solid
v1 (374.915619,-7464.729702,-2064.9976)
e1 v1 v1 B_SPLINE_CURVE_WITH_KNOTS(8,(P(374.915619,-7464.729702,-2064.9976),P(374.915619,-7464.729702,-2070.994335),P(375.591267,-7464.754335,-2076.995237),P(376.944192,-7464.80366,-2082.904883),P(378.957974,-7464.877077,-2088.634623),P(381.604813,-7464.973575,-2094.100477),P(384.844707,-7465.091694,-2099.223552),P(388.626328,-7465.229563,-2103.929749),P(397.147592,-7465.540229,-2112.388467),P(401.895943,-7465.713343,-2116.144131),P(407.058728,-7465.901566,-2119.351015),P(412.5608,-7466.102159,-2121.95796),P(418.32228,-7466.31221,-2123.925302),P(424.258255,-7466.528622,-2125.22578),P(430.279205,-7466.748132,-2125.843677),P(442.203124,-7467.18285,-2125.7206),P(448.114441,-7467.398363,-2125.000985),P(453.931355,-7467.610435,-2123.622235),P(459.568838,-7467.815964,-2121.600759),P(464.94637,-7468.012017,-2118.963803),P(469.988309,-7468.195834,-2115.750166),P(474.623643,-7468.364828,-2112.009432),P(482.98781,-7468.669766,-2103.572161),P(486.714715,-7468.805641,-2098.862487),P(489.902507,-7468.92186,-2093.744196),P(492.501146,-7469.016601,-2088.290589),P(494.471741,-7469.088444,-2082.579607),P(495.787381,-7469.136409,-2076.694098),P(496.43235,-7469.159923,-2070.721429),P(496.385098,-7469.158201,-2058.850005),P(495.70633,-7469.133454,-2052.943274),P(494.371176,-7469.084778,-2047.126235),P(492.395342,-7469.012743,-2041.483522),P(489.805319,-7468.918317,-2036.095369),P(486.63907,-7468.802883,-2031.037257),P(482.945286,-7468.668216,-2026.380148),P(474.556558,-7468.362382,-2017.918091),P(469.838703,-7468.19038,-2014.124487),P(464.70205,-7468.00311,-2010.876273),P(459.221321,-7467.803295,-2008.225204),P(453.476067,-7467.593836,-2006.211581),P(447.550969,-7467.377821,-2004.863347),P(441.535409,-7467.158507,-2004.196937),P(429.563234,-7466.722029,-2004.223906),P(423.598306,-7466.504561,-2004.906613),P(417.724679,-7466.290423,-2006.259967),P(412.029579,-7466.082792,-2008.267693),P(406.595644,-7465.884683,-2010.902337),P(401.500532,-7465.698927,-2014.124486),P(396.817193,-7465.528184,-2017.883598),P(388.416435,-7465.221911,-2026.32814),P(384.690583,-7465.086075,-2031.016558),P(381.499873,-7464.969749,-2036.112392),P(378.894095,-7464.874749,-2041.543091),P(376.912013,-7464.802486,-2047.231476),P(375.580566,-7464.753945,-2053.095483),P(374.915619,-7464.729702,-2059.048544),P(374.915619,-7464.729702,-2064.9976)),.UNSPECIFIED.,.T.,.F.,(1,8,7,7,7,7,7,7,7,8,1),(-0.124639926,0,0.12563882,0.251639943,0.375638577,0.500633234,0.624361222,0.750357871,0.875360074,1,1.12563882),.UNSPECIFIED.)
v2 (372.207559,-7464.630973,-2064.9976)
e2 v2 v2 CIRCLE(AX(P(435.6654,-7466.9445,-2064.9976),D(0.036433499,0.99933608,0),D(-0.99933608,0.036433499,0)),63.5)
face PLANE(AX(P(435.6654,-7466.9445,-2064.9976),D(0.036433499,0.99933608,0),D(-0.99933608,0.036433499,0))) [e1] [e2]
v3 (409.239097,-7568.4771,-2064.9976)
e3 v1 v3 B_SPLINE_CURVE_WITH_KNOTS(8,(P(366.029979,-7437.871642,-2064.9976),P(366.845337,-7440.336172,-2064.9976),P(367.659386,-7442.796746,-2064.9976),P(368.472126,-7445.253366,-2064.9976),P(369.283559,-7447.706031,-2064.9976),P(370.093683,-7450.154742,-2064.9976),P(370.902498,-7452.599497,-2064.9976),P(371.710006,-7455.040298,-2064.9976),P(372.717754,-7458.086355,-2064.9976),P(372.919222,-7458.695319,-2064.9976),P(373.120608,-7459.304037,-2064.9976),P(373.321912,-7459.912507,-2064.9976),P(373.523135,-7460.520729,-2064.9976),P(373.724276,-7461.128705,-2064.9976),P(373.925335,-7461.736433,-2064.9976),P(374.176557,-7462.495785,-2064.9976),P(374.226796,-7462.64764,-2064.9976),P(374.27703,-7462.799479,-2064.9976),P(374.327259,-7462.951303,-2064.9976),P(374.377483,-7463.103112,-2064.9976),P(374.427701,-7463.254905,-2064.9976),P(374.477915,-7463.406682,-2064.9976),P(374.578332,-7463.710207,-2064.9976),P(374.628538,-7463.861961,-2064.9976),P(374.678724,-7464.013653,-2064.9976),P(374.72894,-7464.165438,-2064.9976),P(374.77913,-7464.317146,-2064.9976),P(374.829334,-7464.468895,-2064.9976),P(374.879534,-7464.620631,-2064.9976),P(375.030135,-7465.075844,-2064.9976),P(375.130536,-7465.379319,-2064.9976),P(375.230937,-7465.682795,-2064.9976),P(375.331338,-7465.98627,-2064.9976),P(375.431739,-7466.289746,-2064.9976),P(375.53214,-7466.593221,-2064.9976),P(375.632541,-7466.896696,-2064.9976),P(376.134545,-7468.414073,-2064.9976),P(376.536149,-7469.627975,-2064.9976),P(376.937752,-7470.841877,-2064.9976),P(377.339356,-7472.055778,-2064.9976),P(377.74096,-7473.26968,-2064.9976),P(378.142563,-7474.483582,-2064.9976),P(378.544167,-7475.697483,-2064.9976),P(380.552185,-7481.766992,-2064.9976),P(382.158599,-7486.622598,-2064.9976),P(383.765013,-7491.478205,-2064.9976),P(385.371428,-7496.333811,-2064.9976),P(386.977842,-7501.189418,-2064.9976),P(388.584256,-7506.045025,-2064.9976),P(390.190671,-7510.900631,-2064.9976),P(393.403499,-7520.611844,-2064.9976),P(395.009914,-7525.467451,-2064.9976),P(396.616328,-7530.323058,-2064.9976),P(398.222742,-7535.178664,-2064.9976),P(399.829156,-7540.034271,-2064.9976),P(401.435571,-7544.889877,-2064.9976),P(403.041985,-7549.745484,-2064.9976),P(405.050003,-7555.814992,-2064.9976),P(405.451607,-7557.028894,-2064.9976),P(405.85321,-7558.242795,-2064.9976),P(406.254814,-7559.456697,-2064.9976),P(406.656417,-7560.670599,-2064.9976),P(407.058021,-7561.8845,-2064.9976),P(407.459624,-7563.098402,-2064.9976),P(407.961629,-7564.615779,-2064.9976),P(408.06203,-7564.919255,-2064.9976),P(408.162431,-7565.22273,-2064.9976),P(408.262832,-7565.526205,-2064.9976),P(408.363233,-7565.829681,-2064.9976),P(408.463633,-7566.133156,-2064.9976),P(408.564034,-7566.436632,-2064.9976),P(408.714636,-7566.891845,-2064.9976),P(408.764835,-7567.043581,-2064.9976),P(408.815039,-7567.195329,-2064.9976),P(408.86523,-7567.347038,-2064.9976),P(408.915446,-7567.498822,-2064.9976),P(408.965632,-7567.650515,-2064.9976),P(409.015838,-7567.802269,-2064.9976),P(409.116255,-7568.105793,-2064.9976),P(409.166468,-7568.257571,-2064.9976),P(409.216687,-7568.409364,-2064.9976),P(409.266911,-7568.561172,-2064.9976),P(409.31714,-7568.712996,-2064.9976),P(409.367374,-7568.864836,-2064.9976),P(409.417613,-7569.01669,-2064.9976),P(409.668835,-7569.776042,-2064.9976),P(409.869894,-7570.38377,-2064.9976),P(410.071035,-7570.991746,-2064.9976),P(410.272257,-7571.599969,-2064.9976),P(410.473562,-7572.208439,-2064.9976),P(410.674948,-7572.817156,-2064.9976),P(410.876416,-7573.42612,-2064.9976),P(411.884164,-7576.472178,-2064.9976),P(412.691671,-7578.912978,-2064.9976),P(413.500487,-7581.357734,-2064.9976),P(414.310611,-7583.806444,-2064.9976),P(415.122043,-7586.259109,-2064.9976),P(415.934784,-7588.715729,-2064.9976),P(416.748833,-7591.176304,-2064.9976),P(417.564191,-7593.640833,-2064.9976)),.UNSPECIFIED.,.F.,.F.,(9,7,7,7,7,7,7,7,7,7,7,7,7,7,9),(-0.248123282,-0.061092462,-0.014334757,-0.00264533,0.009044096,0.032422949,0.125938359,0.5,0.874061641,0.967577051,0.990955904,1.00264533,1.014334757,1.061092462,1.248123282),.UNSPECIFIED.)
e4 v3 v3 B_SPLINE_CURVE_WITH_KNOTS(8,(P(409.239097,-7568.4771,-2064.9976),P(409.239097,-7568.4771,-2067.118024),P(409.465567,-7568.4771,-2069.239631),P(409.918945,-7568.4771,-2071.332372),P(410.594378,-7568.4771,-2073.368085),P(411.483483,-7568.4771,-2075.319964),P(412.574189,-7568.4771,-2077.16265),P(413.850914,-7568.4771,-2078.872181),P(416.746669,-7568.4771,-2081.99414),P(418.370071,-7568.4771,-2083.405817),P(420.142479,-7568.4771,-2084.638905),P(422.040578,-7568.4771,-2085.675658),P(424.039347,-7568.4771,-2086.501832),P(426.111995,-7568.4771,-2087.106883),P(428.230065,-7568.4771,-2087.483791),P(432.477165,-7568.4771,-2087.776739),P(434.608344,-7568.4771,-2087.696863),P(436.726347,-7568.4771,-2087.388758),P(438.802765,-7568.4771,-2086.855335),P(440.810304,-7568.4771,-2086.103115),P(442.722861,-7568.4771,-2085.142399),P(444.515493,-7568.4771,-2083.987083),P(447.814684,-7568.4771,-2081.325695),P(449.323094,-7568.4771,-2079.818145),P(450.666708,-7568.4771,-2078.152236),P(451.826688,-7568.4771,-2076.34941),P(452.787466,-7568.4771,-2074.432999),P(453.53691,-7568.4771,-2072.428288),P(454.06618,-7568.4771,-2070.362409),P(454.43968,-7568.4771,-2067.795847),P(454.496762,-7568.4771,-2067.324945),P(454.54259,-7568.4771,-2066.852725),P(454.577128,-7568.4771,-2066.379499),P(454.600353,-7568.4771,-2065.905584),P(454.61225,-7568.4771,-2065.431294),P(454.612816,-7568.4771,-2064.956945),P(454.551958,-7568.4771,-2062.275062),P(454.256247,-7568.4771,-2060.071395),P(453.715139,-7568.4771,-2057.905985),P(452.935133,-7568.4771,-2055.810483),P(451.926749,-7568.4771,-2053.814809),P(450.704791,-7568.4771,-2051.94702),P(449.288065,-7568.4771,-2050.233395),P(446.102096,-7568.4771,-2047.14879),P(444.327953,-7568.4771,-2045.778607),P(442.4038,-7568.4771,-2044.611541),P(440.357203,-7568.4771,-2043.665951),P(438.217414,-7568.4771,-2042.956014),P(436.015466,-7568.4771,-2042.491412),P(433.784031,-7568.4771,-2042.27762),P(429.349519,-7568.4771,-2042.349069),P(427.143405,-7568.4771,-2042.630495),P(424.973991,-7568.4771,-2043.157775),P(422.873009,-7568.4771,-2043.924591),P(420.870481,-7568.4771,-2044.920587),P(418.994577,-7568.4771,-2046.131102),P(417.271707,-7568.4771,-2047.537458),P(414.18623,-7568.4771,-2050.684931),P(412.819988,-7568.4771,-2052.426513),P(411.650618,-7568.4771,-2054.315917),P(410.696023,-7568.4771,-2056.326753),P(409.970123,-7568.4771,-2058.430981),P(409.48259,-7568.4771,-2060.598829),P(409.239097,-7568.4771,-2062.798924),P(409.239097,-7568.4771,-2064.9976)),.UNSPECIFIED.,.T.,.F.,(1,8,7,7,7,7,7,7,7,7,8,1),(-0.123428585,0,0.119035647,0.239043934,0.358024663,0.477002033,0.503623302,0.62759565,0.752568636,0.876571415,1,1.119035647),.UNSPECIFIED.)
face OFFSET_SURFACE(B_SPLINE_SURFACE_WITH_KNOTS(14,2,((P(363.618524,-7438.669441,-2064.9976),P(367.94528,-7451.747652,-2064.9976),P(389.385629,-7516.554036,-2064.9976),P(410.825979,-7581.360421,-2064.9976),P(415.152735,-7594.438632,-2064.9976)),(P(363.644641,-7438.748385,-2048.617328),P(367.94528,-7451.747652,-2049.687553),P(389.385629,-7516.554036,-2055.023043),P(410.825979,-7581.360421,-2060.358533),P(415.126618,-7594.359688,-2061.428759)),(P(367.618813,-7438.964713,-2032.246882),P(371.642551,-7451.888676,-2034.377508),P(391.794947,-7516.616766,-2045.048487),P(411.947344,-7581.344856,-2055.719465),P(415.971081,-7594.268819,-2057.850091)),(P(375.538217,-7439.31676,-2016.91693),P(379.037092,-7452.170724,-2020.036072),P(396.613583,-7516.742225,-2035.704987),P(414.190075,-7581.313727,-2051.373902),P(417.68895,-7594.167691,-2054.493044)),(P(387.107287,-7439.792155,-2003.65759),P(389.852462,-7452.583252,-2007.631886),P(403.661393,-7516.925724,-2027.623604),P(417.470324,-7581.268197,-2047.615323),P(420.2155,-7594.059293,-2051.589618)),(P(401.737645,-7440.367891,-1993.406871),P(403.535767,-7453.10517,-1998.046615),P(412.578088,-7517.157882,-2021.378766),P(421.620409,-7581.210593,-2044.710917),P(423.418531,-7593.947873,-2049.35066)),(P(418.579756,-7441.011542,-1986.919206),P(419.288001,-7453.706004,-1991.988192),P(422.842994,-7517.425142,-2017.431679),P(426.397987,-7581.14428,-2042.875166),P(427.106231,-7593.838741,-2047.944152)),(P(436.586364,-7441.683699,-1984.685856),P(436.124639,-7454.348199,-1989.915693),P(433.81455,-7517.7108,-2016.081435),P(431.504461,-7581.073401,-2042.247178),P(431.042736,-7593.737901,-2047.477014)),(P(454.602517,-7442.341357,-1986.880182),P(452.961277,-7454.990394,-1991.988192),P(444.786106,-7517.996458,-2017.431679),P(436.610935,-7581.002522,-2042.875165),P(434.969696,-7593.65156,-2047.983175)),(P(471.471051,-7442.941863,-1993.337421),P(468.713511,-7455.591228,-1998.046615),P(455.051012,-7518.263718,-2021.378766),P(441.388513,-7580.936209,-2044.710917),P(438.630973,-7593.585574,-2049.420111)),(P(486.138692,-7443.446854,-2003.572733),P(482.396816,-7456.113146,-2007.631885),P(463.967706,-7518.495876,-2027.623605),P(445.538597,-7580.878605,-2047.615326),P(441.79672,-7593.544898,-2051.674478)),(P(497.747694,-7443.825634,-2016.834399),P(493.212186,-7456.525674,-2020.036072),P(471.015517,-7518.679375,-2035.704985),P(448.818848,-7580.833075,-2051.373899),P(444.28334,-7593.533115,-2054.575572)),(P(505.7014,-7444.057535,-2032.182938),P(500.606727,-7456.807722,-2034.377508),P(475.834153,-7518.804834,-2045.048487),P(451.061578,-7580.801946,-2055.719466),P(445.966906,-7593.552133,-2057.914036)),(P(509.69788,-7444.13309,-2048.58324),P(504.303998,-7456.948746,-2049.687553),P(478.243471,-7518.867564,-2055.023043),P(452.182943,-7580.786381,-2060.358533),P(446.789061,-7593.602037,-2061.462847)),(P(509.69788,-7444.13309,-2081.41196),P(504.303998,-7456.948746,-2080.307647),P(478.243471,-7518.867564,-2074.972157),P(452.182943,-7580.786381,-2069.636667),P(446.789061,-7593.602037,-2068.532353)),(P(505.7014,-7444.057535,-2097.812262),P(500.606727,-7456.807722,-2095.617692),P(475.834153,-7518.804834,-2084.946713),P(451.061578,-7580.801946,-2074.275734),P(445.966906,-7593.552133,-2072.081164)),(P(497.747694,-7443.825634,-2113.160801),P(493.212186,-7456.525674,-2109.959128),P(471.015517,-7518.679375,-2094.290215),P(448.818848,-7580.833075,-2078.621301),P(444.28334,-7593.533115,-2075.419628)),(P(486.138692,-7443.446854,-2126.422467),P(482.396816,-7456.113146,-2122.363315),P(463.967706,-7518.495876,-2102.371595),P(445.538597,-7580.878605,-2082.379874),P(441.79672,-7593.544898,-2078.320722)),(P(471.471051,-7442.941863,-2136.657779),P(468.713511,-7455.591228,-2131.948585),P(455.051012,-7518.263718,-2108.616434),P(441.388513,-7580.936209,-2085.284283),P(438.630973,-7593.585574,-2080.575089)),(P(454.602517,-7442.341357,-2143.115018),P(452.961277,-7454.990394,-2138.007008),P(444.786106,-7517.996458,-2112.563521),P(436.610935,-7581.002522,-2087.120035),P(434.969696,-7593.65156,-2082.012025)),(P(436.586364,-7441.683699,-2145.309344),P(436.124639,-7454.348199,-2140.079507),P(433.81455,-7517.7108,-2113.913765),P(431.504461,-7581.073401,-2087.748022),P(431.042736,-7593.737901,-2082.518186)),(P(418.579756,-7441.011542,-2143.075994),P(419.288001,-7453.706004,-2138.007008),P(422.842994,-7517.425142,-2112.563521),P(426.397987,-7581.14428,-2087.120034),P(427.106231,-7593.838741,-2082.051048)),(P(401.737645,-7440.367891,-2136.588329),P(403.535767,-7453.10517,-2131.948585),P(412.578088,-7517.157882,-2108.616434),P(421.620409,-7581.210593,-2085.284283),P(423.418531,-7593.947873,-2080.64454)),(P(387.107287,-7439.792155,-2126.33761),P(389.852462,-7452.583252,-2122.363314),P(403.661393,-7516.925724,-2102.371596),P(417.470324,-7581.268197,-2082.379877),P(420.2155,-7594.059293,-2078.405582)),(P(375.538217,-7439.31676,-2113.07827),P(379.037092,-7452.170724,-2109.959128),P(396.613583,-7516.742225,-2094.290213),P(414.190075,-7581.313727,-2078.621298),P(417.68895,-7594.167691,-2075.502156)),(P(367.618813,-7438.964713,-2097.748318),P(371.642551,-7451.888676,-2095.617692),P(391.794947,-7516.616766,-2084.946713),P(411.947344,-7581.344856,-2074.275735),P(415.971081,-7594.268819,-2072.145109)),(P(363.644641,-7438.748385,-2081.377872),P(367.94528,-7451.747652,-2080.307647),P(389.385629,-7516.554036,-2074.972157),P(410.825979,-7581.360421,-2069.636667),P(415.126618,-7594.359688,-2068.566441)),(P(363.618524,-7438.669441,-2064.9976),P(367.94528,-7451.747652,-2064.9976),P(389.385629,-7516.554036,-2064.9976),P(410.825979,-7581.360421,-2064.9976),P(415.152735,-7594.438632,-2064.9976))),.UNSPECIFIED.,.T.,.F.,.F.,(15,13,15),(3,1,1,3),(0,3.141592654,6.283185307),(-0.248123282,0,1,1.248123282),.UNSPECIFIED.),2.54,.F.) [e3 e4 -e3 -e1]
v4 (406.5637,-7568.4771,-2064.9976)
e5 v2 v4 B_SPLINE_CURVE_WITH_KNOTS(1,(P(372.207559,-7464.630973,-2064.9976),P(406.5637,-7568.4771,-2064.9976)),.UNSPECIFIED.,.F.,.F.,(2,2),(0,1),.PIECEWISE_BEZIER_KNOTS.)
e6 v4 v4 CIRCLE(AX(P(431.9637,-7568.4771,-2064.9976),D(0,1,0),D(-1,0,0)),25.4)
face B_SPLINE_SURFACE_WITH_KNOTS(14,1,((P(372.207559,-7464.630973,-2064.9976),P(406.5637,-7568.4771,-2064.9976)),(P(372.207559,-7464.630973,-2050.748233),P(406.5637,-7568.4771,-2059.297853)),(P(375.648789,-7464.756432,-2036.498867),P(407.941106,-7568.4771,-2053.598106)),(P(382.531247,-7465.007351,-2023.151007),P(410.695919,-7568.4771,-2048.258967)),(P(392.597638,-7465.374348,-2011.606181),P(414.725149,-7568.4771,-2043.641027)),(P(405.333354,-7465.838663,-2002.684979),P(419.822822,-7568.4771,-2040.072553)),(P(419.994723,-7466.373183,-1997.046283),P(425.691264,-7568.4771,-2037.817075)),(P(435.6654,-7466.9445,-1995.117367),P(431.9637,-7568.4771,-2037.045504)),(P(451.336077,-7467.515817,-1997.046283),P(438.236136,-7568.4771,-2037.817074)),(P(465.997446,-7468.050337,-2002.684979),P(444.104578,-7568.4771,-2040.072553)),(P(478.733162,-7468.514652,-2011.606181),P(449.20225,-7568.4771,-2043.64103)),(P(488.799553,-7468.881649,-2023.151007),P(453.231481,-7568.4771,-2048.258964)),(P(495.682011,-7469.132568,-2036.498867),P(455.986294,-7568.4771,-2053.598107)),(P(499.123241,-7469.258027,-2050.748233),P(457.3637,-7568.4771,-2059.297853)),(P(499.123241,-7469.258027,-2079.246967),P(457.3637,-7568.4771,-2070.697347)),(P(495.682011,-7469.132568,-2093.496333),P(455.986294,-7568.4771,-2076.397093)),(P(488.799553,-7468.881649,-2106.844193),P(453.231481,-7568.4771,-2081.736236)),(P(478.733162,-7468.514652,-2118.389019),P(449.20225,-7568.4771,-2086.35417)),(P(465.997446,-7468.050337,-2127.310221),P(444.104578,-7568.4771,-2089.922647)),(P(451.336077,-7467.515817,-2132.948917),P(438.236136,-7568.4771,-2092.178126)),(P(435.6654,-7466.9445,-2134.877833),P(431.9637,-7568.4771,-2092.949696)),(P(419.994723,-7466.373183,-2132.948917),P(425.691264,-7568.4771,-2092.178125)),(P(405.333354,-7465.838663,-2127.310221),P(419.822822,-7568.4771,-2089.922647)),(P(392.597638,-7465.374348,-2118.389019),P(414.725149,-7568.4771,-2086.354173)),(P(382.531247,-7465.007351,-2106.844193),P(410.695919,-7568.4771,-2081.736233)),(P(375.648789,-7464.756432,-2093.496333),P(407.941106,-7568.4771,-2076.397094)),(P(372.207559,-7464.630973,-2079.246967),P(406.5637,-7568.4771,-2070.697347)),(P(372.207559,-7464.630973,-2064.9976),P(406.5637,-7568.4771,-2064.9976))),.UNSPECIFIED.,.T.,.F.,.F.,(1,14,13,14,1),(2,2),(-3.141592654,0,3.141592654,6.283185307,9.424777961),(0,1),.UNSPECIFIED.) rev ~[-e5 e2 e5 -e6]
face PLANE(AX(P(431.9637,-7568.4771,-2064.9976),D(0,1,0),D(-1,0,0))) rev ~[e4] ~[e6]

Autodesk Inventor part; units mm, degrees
ref_plane "YZ Plane" through (0, 0, 0) normal (1, 0, 0) x (0, 1, 0)
ref_plane "XZ Plane" through (0, 0, 0) normal (0, 1, 0) x (-1, 0, 0)
ref_plane "XY Plane" through (0, 0, 0) normal (0, 0, 1) x (1, 0, 0)
ref_plane "Work Plane1" through (7940.0938, -7568.4771, -3491.6601) normal (0, 1, 0) x (-1, 0, 0)
sketch "Sketch1" plane through (7940.0938, -7568.4771, -3491.6601) normal (0, 1, 0) x (-1, 0, 0)
  circle A0 centre (7508.1301, 1426.6625) radius 25.4
  point P0 (7940.0938, 3491.6601)
  dimension "d0" = 50.8
sketch3d "3D Sketch1"
ref_plane "Work Plane2" through (435.6654, -7466.9445, -2064.9976) normal (0.0364335, 0.9993361, 0) x (-0.9993361, 0.0364335, 0)
sketch "Sketch2" plane through (435.6654, -7466.9445, -2064.9976) normal (0.0364335, 0.9993361, 0) x (-0.9993361, 0.0364335, 0)
  circle A0 centre (0, 0) radius 63.5
  point P0 (707.4228, 2064.9976)
  dimension "d2" = 127
loft "Loft1" add profiles "Sketch2", "Sketch1"
shell "Shell1" thickness 2.54 removed faces 2 at (442.5685, -7467.1962, -2046.3452) at (423.819, -7568.4771, -2058.4346)
properties part number "fonl"
